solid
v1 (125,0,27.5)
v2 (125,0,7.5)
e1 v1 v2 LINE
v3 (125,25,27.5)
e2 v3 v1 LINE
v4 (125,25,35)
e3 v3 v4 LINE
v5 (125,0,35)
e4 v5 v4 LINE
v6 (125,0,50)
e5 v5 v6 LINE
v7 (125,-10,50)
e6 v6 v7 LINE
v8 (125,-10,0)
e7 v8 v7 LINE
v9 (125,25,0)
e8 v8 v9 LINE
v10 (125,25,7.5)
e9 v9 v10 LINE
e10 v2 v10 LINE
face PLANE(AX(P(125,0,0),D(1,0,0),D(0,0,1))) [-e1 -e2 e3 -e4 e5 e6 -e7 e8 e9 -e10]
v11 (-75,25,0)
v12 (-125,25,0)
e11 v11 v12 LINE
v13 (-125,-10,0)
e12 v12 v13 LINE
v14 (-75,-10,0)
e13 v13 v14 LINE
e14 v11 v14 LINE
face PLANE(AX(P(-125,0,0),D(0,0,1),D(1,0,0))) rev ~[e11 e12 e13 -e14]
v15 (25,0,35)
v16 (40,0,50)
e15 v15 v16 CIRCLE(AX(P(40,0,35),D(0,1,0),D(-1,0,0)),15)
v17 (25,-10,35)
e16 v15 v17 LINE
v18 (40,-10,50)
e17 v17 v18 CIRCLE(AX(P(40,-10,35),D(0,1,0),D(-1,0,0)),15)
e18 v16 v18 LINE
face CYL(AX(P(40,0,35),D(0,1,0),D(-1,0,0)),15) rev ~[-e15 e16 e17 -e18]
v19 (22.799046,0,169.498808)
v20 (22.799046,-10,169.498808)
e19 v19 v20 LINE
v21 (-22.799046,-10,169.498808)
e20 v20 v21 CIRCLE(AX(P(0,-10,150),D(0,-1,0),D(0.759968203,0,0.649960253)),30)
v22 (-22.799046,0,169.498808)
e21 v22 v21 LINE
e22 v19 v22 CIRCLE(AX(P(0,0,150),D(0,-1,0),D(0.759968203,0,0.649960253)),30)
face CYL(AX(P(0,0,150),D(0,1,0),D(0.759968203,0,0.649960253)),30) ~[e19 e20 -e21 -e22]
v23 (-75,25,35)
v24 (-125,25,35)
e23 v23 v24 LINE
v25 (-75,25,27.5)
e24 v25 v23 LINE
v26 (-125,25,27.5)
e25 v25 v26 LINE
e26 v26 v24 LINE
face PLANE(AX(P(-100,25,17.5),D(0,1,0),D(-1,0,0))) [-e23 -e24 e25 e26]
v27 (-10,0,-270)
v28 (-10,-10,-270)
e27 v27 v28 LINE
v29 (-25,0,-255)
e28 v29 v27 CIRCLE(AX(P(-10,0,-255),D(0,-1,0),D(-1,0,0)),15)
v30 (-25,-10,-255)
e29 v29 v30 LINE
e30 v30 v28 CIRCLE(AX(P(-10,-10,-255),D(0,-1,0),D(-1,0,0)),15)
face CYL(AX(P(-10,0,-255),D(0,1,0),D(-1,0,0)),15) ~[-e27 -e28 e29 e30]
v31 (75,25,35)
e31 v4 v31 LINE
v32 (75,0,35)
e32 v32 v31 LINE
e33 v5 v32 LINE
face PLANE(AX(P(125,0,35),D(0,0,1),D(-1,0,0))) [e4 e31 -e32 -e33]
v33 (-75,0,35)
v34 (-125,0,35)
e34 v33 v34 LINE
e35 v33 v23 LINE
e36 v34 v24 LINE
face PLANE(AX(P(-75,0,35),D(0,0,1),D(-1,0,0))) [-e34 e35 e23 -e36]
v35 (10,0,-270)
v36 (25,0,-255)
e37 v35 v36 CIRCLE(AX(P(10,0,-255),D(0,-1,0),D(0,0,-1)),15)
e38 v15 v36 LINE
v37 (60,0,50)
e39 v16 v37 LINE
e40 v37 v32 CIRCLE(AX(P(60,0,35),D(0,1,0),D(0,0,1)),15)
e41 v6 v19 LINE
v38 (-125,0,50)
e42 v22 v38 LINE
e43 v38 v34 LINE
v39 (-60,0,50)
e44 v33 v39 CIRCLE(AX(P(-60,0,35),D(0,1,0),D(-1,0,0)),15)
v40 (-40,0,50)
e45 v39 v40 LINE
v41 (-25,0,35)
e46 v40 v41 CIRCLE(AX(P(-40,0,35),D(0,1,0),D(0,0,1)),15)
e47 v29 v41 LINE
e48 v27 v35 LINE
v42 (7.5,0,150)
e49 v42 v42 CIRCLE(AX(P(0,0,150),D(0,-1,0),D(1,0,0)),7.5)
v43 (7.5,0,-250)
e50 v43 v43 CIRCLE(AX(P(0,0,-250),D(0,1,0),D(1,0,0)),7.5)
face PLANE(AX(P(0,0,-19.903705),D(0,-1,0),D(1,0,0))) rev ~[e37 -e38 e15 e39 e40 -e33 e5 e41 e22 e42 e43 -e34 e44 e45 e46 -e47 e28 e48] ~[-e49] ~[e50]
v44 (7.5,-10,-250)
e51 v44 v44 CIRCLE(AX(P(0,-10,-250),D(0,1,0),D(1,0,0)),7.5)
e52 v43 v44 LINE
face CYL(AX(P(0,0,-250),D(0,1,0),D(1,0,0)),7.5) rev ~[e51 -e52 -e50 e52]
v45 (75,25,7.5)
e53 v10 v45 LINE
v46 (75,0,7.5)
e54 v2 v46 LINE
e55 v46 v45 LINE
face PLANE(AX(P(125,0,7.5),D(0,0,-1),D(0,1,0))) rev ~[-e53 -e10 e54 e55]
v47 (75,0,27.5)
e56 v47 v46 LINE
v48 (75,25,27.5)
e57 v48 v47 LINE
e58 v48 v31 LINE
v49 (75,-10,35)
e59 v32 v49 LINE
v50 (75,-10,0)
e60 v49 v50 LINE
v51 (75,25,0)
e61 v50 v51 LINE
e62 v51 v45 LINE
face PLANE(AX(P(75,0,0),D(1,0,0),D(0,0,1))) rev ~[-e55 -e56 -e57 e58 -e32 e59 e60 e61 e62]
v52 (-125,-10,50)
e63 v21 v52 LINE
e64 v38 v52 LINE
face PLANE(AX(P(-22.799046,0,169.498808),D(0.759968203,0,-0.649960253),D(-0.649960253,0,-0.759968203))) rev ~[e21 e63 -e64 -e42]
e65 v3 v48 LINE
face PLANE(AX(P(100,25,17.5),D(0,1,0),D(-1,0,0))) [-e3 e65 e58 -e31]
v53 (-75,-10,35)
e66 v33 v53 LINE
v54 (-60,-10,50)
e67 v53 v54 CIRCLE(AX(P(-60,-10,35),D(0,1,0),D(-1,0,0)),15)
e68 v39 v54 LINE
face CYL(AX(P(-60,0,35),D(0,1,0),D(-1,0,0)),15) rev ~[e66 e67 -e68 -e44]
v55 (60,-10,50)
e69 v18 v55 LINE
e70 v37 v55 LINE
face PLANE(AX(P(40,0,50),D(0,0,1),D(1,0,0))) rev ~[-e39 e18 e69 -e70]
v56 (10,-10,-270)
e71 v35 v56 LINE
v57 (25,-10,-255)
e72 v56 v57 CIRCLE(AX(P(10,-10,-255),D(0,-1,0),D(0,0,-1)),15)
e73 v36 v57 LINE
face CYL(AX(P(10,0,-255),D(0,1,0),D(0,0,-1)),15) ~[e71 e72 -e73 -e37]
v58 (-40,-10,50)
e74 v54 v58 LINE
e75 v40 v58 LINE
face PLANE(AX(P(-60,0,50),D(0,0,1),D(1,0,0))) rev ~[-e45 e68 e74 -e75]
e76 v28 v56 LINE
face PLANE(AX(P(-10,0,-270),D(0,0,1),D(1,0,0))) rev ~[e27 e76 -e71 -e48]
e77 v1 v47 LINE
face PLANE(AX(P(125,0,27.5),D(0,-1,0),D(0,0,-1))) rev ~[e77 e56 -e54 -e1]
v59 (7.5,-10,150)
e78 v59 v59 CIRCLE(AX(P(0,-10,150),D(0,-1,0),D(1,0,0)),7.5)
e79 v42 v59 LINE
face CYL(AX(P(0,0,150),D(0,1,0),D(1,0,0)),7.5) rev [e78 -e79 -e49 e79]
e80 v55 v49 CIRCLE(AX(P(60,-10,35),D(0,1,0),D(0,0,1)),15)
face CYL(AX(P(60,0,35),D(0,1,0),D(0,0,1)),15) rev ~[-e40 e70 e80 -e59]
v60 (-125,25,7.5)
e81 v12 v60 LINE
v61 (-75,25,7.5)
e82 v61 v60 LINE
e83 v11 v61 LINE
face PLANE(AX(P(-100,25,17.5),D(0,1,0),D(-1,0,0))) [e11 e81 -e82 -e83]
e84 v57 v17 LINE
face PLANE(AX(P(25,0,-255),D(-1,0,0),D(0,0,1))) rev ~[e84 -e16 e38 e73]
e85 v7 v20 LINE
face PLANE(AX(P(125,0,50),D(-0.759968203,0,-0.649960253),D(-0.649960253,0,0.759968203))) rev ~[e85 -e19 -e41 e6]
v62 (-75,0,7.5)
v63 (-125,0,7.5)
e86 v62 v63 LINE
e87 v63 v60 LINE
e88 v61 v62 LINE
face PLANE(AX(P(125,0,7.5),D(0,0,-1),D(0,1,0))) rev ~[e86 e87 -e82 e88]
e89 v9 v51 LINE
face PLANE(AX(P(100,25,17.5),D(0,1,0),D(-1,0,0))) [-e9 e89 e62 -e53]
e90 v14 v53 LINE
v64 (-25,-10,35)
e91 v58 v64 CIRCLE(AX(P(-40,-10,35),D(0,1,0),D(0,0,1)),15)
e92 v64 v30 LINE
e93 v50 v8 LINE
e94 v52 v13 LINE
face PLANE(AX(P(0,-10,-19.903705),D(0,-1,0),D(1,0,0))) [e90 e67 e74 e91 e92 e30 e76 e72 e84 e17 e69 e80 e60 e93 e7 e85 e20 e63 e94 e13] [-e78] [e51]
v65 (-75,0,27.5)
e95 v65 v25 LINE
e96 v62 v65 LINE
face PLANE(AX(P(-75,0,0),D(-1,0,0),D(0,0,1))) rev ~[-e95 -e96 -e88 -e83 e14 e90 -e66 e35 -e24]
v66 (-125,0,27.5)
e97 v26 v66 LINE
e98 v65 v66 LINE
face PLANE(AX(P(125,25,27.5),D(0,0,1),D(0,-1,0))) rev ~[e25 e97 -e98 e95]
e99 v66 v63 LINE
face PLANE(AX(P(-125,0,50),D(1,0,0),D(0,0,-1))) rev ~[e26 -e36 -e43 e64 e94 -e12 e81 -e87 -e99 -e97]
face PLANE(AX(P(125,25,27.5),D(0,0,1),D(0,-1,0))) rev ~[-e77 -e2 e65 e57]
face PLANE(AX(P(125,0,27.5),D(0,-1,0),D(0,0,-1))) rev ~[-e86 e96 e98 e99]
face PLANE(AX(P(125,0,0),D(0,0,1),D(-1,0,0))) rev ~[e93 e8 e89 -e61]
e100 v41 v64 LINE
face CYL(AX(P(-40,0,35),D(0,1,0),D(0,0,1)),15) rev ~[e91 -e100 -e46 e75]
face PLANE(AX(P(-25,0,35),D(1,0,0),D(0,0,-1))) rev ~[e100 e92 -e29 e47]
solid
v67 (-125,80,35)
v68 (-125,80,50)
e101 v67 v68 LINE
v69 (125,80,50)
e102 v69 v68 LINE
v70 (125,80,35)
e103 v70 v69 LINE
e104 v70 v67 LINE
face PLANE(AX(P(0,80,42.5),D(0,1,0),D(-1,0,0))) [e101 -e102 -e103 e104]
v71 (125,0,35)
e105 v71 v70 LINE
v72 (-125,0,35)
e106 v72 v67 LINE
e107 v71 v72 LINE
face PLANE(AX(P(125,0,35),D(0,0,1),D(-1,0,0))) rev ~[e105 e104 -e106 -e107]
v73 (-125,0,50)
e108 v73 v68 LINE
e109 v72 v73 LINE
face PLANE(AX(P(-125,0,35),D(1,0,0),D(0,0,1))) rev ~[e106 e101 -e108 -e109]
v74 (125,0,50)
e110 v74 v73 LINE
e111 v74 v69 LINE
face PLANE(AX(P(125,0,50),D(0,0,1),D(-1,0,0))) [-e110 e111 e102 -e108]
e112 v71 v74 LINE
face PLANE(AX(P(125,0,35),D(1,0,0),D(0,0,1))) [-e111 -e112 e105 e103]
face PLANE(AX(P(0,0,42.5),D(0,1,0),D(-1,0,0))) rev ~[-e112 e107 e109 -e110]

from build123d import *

# Parameters (mm, degrees)
F0_R     = 7.5
F1_DEPTH = 10
F2_W     = 50
F2_H     = 35
F3_DEPTH = 25
F5_DEPTH = 250.001
F6_W     = 250
F6_H     = 15
F7_DEPTH = 80


with BuildPart() as f1:
    # F0 (on Front) → F1 (new body)
    with BuildSketch(Plane.XZ):
        with BuildLine():
            Line((125, 50), (22.7990460802, 169.4988076003))
            ThreePointArc((22.7990460802, 169.4988076003), (0, 180), (-22.7990460802, 169.4988076003))
            Line((-22.7990460802, 169.4988076003), (-125, 50))
            Line((-125, 50), (-125, 0))
            Line((-125, 0), (-75, 0))
            Line((-75, 0), (-75, 35))
            ThreePointArc((-75, 35), (-70.6066017178, 45.6066017178), (-60, 50))
            Line((-60, 50), (-40, 50))
            ThreePointArc((-40, 50), (-29.3933982822, 45.6066017178), (-25, 35))
            Line((-25, 35), (-25, -255))
            ThreePointArc((-25, -255), (-20.6066017178, -265.6066017178), (-10, -270))
            Line((-10, -270), (0, -270))
            Line((0, -270), (10, -270))
            ThreePointArc((10, -270), (20.6066017178, -265.6066017178), (25, -255))
            Line((25, -255), (25, 35))
            ThreePointArc((25, 35), (29.3933982822, 45.6066017178), (40, 50))
            Line((40, 50), (60, 50))
            ThreePointArc((60, 50), (70.6066017178, 45.6066017178), (75, 35))
            Line((75, 35), (75, 0))
            Line((75, 0), (125, 0))
            Line((125, 0), (125, 50))
        make_face()
        with BuildLine():
            ThreePointArc((0, -242.5), (5.3033008589, -244.6966991411), (7.5, -250))
            ThreePointArc((7.5, -250), (-5.3033008589, -255.3033008589), (0, -242.5))
        make_face(mode=Mode.SUBTRACT)
        with Locations((0, 150)):
            Circle(F0_R, mode=Mode.SUBTRACT)
    extrude(amount=F1_DEPTH)

    # F2 (on face) → F3 (join)
    with BuildSketch(Plane(origin=(0, 0, 0), x_dir=(-1, 0, 0), z_dir=(0, 1, 0))):
        with Locations((-100, 17.5)):
            Rectangle(F2_W, F2_H)
        with Locations((100, 17.5)):
            Rectangle(F2_W, F2_H)
    extrude(amount=F3_DEPTH)

    # F4 (on face) → F5 (cut, through all)
    with BuildSketch(Plane.YZ.offset(125)):
        Polygon((25, 17.5), (25, 27.5), (0, 27.5), (0, 17.5), (0, 7.5), (25, 7.5), align=None)
    extrude(amount=-F5_DEPTH, mode=Mode.SUBTRACT)


with BuildPart() as f7:
    # F6 (on face) → F7 (new body)
    with BuildSketch(Plane(origin=(0, 0, 0), x_dir=(-1, 0, 0), z_dir=(0, 1, 0))):
        with Locations((0, 42.5)):
            Rectangle(F6_W, F6_H)
    extrude(amount=F7_DEPTH)


solid = Compound([f1.part, f7.part])
